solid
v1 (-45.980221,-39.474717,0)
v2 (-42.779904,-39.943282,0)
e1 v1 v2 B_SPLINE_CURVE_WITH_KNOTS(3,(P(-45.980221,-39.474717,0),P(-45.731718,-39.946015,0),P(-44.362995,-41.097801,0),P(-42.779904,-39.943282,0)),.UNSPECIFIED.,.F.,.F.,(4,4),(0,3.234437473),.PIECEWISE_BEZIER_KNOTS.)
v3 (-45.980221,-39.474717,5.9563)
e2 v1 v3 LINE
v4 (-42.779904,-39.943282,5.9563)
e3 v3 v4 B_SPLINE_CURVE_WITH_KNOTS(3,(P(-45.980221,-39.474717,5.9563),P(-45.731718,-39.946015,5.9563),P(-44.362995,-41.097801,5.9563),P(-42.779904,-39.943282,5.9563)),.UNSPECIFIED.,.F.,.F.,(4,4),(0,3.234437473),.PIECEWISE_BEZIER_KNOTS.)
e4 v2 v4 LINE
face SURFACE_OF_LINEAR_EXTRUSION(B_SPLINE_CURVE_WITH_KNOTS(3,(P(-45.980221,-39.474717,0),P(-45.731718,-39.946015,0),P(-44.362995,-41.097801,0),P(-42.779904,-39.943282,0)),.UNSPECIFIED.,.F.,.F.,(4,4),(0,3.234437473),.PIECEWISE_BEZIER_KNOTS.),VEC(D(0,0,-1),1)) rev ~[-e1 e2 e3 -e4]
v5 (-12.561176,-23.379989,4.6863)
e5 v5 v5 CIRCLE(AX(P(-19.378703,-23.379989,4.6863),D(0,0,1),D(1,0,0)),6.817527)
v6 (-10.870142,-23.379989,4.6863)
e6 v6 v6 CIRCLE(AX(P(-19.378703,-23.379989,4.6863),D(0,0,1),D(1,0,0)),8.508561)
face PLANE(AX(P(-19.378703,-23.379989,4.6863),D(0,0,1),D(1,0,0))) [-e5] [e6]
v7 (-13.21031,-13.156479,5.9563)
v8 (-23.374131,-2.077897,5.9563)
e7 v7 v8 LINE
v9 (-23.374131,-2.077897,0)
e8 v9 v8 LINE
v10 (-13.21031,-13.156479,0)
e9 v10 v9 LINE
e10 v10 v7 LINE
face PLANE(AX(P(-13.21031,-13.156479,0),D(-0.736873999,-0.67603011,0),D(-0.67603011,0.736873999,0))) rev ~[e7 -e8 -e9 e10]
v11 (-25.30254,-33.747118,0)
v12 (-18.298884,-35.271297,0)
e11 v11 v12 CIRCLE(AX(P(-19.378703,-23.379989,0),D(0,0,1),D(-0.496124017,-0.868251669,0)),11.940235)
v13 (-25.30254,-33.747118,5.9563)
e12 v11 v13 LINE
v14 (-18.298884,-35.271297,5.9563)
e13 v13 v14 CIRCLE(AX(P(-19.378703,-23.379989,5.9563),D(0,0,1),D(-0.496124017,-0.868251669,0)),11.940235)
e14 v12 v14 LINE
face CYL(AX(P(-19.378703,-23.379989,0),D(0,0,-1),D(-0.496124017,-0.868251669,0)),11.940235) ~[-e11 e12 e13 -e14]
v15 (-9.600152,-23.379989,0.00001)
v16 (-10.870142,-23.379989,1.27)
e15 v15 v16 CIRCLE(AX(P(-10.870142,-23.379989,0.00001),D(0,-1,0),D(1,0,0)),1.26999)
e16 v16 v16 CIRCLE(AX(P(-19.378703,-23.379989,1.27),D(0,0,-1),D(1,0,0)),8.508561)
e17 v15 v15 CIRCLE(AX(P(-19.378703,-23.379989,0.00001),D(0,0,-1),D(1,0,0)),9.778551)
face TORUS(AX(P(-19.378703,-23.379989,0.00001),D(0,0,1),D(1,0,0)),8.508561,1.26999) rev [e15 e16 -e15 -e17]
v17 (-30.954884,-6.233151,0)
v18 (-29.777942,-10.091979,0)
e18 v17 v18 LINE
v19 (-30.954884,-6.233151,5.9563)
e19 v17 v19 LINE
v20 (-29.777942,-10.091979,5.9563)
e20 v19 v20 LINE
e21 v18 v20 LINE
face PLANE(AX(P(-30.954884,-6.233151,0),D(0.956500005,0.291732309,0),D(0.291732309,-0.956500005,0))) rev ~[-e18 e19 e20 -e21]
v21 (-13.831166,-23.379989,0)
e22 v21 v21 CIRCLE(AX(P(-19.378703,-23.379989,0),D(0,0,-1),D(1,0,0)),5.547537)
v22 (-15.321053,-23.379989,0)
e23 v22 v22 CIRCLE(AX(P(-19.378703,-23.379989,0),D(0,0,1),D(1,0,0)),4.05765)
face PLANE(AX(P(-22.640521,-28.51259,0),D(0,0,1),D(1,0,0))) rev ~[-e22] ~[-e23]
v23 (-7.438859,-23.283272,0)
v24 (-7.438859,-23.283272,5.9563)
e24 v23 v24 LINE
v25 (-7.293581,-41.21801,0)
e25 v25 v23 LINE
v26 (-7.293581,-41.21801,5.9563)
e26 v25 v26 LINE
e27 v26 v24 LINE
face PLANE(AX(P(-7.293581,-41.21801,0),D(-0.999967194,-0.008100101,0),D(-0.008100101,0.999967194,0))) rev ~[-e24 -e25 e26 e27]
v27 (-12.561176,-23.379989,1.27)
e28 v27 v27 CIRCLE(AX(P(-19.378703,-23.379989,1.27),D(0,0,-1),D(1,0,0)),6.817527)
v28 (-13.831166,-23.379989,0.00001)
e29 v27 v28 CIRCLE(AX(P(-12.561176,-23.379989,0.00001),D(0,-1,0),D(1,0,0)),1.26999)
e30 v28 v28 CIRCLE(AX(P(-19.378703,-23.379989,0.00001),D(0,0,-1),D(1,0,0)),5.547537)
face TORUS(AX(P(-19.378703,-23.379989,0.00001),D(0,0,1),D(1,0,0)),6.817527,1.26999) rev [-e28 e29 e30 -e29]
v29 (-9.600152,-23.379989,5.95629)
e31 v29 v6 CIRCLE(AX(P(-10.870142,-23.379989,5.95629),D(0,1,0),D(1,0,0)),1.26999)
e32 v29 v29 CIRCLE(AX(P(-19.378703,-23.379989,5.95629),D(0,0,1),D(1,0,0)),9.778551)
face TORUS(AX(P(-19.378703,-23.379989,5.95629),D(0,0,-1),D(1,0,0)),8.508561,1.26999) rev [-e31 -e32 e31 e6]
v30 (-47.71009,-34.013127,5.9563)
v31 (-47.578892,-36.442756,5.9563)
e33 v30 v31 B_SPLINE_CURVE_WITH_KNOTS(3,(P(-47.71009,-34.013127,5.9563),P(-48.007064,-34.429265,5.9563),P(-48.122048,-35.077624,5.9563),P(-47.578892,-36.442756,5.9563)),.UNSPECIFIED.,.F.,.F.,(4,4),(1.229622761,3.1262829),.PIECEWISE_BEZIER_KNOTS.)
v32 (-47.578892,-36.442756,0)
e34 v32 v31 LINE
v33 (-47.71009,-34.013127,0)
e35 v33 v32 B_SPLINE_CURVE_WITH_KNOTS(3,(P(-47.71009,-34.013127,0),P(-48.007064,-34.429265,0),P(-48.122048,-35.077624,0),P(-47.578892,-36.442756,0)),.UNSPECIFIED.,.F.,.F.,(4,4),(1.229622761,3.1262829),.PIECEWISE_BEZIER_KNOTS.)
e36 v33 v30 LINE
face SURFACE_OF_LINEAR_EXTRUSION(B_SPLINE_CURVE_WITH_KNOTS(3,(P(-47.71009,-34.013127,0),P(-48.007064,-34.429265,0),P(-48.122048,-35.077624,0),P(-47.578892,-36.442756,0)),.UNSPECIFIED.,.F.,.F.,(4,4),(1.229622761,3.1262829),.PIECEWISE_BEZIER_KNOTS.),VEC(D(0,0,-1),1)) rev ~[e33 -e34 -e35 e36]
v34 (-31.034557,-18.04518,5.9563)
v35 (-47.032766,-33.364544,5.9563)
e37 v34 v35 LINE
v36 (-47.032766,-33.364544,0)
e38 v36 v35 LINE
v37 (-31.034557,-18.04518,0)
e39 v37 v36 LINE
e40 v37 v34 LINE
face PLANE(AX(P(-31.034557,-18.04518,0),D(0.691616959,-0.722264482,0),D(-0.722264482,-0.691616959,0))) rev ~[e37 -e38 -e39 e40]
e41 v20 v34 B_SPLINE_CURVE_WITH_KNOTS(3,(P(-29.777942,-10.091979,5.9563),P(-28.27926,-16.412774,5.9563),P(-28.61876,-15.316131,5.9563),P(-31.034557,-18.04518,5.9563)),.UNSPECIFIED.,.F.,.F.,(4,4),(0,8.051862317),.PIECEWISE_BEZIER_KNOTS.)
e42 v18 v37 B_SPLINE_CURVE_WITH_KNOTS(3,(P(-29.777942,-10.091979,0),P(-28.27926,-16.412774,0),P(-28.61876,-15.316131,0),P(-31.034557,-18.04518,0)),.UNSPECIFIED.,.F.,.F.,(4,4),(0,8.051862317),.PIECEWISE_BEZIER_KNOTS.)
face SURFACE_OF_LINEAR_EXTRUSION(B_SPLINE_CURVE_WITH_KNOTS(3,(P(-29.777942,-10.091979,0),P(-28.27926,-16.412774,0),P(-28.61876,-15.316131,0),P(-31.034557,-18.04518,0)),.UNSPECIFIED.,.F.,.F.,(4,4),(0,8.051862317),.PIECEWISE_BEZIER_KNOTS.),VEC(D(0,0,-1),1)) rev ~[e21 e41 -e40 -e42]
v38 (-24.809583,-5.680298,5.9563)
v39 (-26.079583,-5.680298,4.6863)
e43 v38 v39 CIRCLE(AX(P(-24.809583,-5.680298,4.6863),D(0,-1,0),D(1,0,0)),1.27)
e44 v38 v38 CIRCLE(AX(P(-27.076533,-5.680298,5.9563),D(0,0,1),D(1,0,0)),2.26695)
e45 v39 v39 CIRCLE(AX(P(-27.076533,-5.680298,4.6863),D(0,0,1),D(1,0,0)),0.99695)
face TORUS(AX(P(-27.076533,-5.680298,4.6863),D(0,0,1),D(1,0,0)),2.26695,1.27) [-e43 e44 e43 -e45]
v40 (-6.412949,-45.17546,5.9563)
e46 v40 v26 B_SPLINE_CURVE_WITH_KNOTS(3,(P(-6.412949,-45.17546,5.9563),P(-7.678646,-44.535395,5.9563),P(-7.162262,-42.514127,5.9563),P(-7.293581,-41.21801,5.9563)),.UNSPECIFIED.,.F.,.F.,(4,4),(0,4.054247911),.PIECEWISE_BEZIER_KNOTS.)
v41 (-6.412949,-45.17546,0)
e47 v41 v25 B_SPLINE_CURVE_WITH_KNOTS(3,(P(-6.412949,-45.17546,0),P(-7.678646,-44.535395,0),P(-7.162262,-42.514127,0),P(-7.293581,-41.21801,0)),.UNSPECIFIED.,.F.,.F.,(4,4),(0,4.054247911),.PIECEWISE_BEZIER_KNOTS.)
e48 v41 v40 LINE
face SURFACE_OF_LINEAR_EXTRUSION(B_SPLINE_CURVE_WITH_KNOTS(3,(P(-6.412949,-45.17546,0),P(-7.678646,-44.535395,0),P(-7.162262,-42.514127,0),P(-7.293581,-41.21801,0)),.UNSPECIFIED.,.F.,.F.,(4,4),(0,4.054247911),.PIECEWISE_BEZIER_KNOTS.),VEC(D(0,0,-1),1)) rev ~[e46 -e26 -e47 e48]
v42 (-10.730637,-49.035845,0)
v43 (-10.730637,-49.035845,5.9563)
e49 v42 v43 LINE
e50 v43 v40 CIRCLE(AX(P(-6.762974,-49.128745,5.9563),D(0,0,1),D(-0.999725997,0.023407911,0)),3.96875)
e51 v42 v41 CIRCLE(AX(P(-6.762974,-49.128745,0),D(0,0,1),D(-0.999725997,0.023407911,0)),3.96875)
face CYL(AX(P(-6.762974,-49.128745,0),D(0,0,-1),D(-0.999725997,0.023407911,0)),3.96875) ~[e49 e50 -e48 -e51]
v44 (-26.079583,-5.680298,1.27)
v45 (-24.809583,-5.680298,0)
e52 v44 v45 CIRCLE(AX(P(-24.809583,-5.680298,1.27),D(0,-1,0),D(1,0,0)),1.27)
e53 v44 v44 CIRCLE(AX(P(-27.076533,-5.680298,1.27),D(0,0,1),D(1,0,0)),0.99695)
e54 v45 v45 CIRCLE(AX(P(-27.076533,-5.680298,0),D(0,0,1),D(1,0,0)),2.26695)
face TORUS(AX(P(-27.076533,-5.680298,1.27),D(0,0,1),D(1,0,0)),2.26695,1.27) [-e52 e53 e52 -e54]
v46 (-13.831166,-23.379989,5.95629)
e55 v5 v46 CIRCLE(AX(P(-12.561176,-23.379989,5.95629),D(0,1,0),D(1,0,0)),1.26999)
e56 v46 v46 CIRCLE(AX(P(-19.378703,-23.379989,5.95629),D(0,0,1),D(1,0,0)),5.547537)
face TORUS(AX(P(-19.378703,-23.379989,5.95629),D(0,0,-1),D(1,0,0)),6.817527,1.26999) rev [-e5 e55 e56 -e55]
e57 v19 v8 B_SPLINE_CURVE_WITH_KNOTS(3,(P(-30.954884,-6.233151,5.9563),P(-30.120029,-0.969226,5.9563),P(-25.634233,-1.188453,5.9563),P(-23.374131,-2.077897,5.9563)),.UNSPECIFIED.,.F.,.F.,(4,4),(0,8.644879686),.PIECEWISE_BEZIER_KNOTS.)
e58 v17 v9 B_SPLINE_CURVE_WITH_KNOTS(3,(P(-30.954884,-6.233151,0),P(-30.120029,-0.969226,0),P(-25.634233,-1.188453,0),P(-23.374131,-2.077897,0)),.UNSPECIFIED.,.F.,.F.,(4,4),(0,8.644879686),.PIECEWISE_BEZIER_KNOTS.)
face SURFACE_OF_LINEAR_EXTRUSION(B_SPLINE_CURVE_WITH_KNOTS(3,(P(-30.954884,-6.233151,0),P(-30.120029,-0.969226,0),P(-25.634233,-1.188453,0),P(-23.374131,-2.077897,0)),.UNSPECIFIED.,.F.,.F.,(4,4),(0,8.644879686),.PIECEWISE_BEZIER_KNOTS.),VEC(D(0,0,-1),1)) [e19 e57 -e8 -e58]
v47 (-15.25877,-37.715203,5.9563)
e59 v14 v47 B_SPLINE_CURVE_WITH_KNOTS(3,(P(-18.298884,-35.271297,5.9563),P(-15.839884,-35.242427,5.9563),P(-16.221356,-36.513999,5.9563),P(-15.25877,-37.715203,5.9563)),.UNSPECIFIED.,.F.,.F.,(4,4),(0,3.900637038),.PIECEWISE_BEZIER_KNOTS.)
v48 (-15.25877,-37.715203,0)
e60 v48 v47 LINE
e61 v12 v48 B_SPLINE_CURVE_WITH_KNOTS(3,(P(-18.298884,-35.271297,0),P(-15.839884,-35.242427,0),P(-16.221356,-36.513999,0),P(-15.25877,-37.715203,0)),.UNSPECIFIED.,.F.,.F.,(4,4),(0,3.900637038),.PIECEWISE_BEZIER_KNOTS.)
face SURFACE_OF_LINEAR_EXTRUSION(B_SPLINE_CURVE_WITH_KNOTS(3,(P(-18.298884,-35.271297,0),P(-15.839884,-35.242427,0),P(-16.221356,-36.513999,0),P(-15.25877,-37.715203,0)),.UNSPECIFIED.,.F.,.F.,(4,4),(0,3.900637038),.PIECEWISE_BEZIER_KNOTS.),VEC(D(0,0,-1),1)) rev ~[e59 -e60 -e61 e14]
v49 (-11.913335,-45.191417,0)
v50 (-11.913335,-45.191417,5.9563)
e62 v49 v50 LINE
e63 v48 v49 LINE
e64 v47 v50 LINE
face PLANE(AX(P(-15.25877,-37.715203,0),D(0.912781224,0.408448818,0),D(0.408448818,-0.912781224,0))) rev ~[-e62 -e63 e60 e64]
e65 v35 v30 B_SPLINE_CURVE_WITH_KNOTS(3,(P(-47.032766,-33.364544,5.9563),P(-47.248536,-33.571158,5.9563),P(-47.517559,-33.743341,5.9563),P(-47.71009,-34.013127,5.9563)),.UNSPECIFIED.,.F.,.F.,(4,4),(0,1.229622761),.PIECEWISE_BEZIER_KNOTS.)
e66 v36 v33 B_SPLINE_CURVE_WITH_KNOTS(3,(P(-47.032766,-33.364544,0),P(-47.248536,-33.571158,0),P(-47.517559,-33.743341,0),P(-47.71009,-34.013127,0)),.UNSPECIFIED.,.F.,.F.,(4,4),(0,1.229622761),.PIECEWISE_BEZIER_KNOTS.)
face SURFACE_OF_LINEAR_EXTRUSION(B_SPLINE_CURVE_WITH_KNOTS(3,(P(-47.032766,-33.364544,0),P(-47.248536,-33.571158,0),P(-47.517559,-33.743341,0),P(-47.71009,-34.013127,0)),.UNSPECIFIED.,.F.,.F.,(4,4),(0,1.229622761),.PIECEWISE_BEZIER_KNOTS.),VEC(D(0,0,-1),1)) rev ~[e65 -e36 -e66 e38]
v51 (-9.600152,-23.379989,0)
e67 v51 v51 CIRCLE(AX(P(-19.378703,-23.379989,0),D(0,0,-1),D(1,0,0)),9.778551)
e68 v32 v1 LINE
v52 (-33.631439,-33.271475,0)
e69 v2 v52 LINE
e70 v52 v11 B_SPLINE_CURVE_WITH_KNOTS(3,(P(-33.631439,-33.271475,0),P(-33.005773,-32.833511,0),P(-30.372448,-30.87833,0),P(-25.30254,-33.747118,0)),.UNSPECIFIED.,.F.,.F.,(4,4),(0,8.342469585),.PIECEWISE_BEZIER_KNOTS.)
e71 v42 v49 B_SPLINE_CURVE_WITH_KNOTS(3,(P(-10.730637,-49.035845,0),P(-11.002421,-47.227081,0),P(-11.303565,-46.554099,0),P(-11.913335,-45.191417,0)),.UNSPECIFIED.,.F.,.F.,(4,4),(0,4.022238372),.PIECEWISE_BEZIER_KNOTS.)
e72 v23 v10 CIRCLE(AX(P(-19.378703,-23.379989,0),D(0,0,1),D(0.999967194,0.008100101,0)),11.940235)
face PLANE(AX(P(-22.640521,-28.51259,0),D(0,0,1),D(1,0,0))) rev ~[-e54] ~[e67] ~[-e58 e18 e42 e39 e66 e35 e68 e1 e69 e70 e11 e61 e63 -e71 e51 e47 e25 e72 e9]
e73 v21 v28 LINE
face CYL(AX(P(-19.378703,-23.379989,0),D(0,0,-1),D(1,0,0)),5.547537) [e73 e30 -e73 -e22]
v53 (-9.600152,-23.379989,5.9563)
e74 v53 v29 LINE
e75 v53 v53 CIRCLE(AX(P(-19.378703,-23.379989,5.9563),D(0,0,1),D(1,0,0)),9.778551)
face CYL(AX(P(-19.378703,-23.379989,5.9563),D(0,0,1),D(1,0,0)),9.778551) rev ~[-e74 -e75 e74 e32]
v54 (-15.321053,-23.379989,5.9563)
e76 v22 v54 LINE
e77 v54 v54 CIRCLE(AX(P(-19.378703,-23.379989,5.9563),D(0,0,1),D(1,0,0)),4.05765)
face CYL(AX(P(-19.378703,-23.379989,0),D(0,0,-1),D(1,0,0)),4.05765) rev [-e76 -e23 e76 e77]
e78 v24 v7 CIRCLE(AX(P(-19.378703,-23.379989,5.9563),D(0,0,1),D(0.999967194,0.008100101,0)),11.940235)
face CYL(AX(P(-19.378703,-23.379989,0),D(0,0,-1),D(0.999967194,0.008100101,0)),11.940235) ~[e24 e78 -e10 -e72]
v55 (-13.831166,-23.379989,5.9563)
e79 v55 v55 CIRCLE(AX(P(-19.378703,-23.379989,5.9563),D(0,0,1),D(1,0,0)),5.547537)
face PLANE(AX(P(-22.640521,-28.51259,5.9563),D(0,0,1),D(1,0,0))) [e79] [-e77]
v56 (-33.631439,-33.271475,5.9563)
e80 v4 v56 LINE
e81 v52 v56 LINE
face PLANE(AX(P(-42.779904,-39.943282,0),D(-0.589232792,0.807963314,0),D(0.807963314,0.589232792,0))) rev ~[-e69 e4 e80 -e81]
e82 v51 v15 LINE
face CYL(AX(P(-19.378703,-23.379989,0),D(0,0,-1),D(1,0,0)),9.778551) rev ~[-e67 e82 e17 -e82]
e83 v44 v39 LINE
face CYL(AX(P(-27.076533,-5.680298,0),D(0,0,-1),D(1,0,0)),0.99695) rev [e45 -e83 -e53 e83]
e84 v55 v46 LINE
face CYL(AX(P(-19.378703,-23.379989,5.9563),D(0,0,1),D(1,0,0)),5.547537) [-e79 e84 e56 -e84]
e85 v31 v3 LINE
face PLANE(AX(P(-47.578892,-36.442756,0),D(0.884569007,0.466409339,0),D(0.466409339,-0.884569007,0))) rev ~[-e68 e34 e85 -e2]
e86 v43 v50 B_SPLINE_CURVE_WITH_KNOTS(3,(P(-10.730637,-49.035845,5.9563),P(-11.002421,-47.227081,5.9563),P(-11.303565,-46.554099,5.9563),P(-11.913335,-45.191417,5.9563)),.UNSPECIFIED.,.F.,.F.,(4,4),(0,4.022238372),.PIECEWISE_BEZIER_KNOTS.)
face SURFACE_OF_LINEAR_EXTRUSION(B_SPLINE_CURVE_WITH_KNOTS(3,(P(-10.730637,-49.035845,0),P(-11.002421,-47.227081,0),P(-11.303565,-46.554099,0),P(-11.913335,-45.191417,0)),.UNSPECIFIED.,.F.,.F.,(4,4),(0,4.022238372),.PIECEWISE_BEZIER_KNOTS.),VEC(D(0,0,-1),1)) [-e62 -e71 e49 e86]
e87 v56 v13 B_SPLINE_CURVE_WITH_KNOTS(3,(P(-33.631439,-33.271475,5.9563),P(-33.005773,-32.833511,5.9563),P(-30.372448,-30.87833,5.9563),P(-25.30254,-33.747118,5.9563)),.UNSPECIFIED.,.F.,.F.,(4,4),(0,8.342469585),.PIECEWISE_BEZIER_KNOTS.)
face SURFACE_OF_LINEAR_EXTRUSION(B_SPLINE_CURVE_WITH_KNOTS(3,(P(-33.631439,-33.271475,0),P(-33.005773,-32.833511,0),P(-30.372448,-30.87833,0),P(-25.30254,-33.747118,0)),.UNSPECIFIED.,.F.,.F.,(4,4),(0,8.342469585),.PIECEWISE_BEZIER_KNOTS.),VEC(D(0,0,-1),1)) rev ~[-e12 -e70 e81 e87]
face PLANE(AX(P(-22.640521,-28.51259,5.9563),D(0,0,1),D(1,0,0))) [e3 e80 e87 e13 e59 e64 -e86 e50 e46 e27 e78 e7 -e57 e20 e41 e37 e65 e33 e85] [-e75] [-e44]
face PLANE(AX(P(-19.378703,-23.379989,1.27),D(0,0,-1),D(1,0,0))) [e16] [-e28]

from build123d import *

# Parameters (mm, degrees)
F0_R     = 0.99695
F0_R_2   = 4.05765
F1_DEPTH = 5.9563
F2_R     = 9.7785511171
F2_R_2   = 5.5475367741
F3_DEPTH = 1.27
F4_R     = 1.26999
F5_R     = 1.27
F6_R     = 9.7785511171
F6_R_2   = 5.5475367741
F7_DEPTH = 1.27
F8_R     = 1.26999


# Not quite as in the source:
# - a fillet or chamfer is up to 0.001 mm smaller than in the source, because OpenCascade refuses the exact size


with BuildPart() as f1:
    # F0 (on Top) → F1 (new body)
    with BuildSketch(Plane.XY):
        with BuildLine():
            add(Edge.make_bspline(
                [(-33.6314394073, -33.2714746118), (-33.0057731764, -32.8335108579), (-30.3724482656, -30.8783296496), (-25.3025401745, -33.7471177082)],
                knots=[0, 0, 0, 0, 8.3424695855, 8.3424695855, 8.3424695855, 8.3424695855], degree=3))
            ThreePointArc((-25.3025401746, -33.7471177082), (-21.9177791625, -35.0471350698), (-18.2988837725, -35.2712966298))
            add(Edge.make_bspline(
                [(-18.2988837725, -35.2712966298), (-15.8398840576, -35.2424271405), (-16.2213556468, -36.5139991045), (-15.2587701461, -37.7152030189)],
                knots=[0, 0, 0, 0, 3.9006370377, 3.9006370377, 3.9006370377, 3.9006370377], degree=3))
            Line((-15.2587701461, -37.7152030189), (-11.9133347475, -45.1914166357))
            add(Edge.make_bspline(
                [(-10.7306365161, -49.0358446052), (-11.0024214771, -47.2270805733), (-11.3035654868, -46.5540988301), (-11.9133347475, -45.1914166357)],
                knots=[0, 0, 0, 0, 4.0222383717, 4.0222383717, 4.0222383717, 4.0222383717], degree=3))
            ThreePointArc((-10.7306365161, -49.0358446052), (-4.1177013069, -52.0873777347), (-6.4129489899, -45.1754601574))
            add(Edge.make_bspline(
                [(-6.4129489899, -45.1754601574), (-7.6786461286, -44.535394758), (-7.1622622199, -42.5141267478), (-7.293581398, -41.2180098819)],
                knots=[0, 0, 0, 0, 4.0542479106, 4.0542479106, 4.0542479106, 4.0542479106], degree=3))
            Line((-7.293581398, -41.2180098819), (-7.4388593588, -23.2832715275))
            ThreePointArc((-7.4388593588, -23.2832715275), (-9.004936212, -17.4677824297), (-13.2103104288, -13.1564789315))
            Line((-13.2103104288, -13.1564789315), (-23.3741309494, -2.0778968465))
            add(Edge.make_bspline(
                [(-30.9548836637, -6.2331505183), (-30.120029344, -0.9692255704), (-25.6342329085, -1.1884529376), (-23.3741309494, -2.0778968465)],
                knots=[0, 0, 0, 0, 8.6448796864, 8.6448796864, 8.6448796864, 8.6448796864], degree=3))
            Line((-30.9548836637, -6.2331505183), (-29.7779418645, -10.0919786303))
            add(Edge.make_bspline(
                [(-29.7779418645, -10.0919786303), (-28.2792598009, -16.4127741009), (-28.6187601862, -15.316130835), (-31.0345571488, -18.0451795459)],
                knots=[0, 0, 0, 0, 8.0518623173, 8.0518623173, 8.0518623173, 8.0518623173], degree=3))
            Line((-31.0345571488, -18.0451795459), (-47.0327663969, -33.3645439807))
            Line((-47.0327663969, -33.3645439807), (-47.710090224, -34.0131272307))
            add(Edge.make_bspline(
                [(-47.710090224, -34.0131272307), (-48.0070644447, -34.4292653886), (-48.1220479631, -35.0776240912), (-47.5788922065, -36.4427563472)],
                knots=[1.2296227613, 1.2296227613, 1.2296227613, 1.2296227613, 3.1262829004, 3.1262829004, 3.1262829004, 3.1262829004], degree=3))
            Line((-47.5788922065, -36.4427563472), (-45.9802214515, -39.4747166527))
            add(Edge.make_bspline(
                [(-45.9802214515, -39.4747166527), (-45.7317184979, -39.9460151291), (-44.362995404, -41.0978011232), (-42.7799038589, -39.9432815611)],
                knots=[0, 0, 0, 0, 3.234437473, 3.234437473, 3.234437473, 3.234437473], degree=3))
            Line((-42.7799038589, -39.9432815611), (-33.6314394073, -33.2714746118))
        make_face()
        with Locations((-27.0765330642, -5.6802984327)):
            Circle(F0_R, mode=Mode.SUBTRACT)
        with Locations((-19.3787027653, -23.3799886397)):
            Circle(F0_R_2, mode=Mode.SUBTRACT)
        with BuildLine():
            add(Edge.make_bspline(
                [(-47.0327663969, -33.3645439807), (-47.2485361779, -33.5711580997), (-47.5175590194, -33.7433409151), (-47.710090224, -34.0131272307)],
                knots=[0, 0, 0, 0, 1.2296227613, 1.2296227613, 1.2296227613, 1.2296227613], degree=3))
            Line((-47.710090224, -34.0131272307), (-47.0327663969, -33.3645439807))
        make_face()
    extrude(amount=F1_DEPTH)

    # F2 (on face) → F3 (cut)
    with BuildSketch(Plane.XY.offset(5.9563)):
        with Locations((-19.3787027653, -23.3799886397)):
            Circle(F2_R)
        with Locations((-19.3787027653, -23.3799886397)):
            Circle(F2_R_2, mode=Mode.SUBTRACT)
    extrude(amount=-F3_DEPTH, mode=Mode.SUBTRACT)

    # F4 (radius 1.27 in the source; OpenCascade refuses exactly that, so slightly less here)
    f4_edges = [f1.edges().sort_by_distance(p)[0] for p in [
        (-29.157254, -23.379989, 4.6863),
        (-24.92624, -23.379989, 4.6863),
    ]]
    fillet(f4_edges, radius=F4_R)

    # F5
    f5_edges = [f1.edges().sort_by_distance(p)[0] for p in [
        (-28.073483, -5.680298, 5.9563),
        (-28.073483, -5.680298, 0),
    ]]
    fillet(f5_edges, radius=F5_R)

    # F6 (on face) → F7 (cut)
    with BuildSketch(Plane(origin=(0, 0, 0), x_dir=(1, 0, 0), z_dir=(0, 0, -1))):
        with Locations((-19.3787027653, 23.3799886397)):
            Circle(F6_R)
        with Locations((-19.3787027653, 23.3799886397)):
            Circle(F6_R_2, mode=Mode.SUBTRACT)
    extrude(amount=-F7_DEPTH, mode=Mode.SUBTRACT)

    # F8 (radius 1.27 in the source; OpenCascade refuses exactly that, so slightly less here)
    f8_edges = [f1.edges().sort_by_distance(p)[0] for p in [
        (-29.157254, -23.379989, 1.27),
        (-24.92624, -23.379989, 1.27),
    ]]
    fillet(f8_edges, radius=F8_R)


solid = f1.part
